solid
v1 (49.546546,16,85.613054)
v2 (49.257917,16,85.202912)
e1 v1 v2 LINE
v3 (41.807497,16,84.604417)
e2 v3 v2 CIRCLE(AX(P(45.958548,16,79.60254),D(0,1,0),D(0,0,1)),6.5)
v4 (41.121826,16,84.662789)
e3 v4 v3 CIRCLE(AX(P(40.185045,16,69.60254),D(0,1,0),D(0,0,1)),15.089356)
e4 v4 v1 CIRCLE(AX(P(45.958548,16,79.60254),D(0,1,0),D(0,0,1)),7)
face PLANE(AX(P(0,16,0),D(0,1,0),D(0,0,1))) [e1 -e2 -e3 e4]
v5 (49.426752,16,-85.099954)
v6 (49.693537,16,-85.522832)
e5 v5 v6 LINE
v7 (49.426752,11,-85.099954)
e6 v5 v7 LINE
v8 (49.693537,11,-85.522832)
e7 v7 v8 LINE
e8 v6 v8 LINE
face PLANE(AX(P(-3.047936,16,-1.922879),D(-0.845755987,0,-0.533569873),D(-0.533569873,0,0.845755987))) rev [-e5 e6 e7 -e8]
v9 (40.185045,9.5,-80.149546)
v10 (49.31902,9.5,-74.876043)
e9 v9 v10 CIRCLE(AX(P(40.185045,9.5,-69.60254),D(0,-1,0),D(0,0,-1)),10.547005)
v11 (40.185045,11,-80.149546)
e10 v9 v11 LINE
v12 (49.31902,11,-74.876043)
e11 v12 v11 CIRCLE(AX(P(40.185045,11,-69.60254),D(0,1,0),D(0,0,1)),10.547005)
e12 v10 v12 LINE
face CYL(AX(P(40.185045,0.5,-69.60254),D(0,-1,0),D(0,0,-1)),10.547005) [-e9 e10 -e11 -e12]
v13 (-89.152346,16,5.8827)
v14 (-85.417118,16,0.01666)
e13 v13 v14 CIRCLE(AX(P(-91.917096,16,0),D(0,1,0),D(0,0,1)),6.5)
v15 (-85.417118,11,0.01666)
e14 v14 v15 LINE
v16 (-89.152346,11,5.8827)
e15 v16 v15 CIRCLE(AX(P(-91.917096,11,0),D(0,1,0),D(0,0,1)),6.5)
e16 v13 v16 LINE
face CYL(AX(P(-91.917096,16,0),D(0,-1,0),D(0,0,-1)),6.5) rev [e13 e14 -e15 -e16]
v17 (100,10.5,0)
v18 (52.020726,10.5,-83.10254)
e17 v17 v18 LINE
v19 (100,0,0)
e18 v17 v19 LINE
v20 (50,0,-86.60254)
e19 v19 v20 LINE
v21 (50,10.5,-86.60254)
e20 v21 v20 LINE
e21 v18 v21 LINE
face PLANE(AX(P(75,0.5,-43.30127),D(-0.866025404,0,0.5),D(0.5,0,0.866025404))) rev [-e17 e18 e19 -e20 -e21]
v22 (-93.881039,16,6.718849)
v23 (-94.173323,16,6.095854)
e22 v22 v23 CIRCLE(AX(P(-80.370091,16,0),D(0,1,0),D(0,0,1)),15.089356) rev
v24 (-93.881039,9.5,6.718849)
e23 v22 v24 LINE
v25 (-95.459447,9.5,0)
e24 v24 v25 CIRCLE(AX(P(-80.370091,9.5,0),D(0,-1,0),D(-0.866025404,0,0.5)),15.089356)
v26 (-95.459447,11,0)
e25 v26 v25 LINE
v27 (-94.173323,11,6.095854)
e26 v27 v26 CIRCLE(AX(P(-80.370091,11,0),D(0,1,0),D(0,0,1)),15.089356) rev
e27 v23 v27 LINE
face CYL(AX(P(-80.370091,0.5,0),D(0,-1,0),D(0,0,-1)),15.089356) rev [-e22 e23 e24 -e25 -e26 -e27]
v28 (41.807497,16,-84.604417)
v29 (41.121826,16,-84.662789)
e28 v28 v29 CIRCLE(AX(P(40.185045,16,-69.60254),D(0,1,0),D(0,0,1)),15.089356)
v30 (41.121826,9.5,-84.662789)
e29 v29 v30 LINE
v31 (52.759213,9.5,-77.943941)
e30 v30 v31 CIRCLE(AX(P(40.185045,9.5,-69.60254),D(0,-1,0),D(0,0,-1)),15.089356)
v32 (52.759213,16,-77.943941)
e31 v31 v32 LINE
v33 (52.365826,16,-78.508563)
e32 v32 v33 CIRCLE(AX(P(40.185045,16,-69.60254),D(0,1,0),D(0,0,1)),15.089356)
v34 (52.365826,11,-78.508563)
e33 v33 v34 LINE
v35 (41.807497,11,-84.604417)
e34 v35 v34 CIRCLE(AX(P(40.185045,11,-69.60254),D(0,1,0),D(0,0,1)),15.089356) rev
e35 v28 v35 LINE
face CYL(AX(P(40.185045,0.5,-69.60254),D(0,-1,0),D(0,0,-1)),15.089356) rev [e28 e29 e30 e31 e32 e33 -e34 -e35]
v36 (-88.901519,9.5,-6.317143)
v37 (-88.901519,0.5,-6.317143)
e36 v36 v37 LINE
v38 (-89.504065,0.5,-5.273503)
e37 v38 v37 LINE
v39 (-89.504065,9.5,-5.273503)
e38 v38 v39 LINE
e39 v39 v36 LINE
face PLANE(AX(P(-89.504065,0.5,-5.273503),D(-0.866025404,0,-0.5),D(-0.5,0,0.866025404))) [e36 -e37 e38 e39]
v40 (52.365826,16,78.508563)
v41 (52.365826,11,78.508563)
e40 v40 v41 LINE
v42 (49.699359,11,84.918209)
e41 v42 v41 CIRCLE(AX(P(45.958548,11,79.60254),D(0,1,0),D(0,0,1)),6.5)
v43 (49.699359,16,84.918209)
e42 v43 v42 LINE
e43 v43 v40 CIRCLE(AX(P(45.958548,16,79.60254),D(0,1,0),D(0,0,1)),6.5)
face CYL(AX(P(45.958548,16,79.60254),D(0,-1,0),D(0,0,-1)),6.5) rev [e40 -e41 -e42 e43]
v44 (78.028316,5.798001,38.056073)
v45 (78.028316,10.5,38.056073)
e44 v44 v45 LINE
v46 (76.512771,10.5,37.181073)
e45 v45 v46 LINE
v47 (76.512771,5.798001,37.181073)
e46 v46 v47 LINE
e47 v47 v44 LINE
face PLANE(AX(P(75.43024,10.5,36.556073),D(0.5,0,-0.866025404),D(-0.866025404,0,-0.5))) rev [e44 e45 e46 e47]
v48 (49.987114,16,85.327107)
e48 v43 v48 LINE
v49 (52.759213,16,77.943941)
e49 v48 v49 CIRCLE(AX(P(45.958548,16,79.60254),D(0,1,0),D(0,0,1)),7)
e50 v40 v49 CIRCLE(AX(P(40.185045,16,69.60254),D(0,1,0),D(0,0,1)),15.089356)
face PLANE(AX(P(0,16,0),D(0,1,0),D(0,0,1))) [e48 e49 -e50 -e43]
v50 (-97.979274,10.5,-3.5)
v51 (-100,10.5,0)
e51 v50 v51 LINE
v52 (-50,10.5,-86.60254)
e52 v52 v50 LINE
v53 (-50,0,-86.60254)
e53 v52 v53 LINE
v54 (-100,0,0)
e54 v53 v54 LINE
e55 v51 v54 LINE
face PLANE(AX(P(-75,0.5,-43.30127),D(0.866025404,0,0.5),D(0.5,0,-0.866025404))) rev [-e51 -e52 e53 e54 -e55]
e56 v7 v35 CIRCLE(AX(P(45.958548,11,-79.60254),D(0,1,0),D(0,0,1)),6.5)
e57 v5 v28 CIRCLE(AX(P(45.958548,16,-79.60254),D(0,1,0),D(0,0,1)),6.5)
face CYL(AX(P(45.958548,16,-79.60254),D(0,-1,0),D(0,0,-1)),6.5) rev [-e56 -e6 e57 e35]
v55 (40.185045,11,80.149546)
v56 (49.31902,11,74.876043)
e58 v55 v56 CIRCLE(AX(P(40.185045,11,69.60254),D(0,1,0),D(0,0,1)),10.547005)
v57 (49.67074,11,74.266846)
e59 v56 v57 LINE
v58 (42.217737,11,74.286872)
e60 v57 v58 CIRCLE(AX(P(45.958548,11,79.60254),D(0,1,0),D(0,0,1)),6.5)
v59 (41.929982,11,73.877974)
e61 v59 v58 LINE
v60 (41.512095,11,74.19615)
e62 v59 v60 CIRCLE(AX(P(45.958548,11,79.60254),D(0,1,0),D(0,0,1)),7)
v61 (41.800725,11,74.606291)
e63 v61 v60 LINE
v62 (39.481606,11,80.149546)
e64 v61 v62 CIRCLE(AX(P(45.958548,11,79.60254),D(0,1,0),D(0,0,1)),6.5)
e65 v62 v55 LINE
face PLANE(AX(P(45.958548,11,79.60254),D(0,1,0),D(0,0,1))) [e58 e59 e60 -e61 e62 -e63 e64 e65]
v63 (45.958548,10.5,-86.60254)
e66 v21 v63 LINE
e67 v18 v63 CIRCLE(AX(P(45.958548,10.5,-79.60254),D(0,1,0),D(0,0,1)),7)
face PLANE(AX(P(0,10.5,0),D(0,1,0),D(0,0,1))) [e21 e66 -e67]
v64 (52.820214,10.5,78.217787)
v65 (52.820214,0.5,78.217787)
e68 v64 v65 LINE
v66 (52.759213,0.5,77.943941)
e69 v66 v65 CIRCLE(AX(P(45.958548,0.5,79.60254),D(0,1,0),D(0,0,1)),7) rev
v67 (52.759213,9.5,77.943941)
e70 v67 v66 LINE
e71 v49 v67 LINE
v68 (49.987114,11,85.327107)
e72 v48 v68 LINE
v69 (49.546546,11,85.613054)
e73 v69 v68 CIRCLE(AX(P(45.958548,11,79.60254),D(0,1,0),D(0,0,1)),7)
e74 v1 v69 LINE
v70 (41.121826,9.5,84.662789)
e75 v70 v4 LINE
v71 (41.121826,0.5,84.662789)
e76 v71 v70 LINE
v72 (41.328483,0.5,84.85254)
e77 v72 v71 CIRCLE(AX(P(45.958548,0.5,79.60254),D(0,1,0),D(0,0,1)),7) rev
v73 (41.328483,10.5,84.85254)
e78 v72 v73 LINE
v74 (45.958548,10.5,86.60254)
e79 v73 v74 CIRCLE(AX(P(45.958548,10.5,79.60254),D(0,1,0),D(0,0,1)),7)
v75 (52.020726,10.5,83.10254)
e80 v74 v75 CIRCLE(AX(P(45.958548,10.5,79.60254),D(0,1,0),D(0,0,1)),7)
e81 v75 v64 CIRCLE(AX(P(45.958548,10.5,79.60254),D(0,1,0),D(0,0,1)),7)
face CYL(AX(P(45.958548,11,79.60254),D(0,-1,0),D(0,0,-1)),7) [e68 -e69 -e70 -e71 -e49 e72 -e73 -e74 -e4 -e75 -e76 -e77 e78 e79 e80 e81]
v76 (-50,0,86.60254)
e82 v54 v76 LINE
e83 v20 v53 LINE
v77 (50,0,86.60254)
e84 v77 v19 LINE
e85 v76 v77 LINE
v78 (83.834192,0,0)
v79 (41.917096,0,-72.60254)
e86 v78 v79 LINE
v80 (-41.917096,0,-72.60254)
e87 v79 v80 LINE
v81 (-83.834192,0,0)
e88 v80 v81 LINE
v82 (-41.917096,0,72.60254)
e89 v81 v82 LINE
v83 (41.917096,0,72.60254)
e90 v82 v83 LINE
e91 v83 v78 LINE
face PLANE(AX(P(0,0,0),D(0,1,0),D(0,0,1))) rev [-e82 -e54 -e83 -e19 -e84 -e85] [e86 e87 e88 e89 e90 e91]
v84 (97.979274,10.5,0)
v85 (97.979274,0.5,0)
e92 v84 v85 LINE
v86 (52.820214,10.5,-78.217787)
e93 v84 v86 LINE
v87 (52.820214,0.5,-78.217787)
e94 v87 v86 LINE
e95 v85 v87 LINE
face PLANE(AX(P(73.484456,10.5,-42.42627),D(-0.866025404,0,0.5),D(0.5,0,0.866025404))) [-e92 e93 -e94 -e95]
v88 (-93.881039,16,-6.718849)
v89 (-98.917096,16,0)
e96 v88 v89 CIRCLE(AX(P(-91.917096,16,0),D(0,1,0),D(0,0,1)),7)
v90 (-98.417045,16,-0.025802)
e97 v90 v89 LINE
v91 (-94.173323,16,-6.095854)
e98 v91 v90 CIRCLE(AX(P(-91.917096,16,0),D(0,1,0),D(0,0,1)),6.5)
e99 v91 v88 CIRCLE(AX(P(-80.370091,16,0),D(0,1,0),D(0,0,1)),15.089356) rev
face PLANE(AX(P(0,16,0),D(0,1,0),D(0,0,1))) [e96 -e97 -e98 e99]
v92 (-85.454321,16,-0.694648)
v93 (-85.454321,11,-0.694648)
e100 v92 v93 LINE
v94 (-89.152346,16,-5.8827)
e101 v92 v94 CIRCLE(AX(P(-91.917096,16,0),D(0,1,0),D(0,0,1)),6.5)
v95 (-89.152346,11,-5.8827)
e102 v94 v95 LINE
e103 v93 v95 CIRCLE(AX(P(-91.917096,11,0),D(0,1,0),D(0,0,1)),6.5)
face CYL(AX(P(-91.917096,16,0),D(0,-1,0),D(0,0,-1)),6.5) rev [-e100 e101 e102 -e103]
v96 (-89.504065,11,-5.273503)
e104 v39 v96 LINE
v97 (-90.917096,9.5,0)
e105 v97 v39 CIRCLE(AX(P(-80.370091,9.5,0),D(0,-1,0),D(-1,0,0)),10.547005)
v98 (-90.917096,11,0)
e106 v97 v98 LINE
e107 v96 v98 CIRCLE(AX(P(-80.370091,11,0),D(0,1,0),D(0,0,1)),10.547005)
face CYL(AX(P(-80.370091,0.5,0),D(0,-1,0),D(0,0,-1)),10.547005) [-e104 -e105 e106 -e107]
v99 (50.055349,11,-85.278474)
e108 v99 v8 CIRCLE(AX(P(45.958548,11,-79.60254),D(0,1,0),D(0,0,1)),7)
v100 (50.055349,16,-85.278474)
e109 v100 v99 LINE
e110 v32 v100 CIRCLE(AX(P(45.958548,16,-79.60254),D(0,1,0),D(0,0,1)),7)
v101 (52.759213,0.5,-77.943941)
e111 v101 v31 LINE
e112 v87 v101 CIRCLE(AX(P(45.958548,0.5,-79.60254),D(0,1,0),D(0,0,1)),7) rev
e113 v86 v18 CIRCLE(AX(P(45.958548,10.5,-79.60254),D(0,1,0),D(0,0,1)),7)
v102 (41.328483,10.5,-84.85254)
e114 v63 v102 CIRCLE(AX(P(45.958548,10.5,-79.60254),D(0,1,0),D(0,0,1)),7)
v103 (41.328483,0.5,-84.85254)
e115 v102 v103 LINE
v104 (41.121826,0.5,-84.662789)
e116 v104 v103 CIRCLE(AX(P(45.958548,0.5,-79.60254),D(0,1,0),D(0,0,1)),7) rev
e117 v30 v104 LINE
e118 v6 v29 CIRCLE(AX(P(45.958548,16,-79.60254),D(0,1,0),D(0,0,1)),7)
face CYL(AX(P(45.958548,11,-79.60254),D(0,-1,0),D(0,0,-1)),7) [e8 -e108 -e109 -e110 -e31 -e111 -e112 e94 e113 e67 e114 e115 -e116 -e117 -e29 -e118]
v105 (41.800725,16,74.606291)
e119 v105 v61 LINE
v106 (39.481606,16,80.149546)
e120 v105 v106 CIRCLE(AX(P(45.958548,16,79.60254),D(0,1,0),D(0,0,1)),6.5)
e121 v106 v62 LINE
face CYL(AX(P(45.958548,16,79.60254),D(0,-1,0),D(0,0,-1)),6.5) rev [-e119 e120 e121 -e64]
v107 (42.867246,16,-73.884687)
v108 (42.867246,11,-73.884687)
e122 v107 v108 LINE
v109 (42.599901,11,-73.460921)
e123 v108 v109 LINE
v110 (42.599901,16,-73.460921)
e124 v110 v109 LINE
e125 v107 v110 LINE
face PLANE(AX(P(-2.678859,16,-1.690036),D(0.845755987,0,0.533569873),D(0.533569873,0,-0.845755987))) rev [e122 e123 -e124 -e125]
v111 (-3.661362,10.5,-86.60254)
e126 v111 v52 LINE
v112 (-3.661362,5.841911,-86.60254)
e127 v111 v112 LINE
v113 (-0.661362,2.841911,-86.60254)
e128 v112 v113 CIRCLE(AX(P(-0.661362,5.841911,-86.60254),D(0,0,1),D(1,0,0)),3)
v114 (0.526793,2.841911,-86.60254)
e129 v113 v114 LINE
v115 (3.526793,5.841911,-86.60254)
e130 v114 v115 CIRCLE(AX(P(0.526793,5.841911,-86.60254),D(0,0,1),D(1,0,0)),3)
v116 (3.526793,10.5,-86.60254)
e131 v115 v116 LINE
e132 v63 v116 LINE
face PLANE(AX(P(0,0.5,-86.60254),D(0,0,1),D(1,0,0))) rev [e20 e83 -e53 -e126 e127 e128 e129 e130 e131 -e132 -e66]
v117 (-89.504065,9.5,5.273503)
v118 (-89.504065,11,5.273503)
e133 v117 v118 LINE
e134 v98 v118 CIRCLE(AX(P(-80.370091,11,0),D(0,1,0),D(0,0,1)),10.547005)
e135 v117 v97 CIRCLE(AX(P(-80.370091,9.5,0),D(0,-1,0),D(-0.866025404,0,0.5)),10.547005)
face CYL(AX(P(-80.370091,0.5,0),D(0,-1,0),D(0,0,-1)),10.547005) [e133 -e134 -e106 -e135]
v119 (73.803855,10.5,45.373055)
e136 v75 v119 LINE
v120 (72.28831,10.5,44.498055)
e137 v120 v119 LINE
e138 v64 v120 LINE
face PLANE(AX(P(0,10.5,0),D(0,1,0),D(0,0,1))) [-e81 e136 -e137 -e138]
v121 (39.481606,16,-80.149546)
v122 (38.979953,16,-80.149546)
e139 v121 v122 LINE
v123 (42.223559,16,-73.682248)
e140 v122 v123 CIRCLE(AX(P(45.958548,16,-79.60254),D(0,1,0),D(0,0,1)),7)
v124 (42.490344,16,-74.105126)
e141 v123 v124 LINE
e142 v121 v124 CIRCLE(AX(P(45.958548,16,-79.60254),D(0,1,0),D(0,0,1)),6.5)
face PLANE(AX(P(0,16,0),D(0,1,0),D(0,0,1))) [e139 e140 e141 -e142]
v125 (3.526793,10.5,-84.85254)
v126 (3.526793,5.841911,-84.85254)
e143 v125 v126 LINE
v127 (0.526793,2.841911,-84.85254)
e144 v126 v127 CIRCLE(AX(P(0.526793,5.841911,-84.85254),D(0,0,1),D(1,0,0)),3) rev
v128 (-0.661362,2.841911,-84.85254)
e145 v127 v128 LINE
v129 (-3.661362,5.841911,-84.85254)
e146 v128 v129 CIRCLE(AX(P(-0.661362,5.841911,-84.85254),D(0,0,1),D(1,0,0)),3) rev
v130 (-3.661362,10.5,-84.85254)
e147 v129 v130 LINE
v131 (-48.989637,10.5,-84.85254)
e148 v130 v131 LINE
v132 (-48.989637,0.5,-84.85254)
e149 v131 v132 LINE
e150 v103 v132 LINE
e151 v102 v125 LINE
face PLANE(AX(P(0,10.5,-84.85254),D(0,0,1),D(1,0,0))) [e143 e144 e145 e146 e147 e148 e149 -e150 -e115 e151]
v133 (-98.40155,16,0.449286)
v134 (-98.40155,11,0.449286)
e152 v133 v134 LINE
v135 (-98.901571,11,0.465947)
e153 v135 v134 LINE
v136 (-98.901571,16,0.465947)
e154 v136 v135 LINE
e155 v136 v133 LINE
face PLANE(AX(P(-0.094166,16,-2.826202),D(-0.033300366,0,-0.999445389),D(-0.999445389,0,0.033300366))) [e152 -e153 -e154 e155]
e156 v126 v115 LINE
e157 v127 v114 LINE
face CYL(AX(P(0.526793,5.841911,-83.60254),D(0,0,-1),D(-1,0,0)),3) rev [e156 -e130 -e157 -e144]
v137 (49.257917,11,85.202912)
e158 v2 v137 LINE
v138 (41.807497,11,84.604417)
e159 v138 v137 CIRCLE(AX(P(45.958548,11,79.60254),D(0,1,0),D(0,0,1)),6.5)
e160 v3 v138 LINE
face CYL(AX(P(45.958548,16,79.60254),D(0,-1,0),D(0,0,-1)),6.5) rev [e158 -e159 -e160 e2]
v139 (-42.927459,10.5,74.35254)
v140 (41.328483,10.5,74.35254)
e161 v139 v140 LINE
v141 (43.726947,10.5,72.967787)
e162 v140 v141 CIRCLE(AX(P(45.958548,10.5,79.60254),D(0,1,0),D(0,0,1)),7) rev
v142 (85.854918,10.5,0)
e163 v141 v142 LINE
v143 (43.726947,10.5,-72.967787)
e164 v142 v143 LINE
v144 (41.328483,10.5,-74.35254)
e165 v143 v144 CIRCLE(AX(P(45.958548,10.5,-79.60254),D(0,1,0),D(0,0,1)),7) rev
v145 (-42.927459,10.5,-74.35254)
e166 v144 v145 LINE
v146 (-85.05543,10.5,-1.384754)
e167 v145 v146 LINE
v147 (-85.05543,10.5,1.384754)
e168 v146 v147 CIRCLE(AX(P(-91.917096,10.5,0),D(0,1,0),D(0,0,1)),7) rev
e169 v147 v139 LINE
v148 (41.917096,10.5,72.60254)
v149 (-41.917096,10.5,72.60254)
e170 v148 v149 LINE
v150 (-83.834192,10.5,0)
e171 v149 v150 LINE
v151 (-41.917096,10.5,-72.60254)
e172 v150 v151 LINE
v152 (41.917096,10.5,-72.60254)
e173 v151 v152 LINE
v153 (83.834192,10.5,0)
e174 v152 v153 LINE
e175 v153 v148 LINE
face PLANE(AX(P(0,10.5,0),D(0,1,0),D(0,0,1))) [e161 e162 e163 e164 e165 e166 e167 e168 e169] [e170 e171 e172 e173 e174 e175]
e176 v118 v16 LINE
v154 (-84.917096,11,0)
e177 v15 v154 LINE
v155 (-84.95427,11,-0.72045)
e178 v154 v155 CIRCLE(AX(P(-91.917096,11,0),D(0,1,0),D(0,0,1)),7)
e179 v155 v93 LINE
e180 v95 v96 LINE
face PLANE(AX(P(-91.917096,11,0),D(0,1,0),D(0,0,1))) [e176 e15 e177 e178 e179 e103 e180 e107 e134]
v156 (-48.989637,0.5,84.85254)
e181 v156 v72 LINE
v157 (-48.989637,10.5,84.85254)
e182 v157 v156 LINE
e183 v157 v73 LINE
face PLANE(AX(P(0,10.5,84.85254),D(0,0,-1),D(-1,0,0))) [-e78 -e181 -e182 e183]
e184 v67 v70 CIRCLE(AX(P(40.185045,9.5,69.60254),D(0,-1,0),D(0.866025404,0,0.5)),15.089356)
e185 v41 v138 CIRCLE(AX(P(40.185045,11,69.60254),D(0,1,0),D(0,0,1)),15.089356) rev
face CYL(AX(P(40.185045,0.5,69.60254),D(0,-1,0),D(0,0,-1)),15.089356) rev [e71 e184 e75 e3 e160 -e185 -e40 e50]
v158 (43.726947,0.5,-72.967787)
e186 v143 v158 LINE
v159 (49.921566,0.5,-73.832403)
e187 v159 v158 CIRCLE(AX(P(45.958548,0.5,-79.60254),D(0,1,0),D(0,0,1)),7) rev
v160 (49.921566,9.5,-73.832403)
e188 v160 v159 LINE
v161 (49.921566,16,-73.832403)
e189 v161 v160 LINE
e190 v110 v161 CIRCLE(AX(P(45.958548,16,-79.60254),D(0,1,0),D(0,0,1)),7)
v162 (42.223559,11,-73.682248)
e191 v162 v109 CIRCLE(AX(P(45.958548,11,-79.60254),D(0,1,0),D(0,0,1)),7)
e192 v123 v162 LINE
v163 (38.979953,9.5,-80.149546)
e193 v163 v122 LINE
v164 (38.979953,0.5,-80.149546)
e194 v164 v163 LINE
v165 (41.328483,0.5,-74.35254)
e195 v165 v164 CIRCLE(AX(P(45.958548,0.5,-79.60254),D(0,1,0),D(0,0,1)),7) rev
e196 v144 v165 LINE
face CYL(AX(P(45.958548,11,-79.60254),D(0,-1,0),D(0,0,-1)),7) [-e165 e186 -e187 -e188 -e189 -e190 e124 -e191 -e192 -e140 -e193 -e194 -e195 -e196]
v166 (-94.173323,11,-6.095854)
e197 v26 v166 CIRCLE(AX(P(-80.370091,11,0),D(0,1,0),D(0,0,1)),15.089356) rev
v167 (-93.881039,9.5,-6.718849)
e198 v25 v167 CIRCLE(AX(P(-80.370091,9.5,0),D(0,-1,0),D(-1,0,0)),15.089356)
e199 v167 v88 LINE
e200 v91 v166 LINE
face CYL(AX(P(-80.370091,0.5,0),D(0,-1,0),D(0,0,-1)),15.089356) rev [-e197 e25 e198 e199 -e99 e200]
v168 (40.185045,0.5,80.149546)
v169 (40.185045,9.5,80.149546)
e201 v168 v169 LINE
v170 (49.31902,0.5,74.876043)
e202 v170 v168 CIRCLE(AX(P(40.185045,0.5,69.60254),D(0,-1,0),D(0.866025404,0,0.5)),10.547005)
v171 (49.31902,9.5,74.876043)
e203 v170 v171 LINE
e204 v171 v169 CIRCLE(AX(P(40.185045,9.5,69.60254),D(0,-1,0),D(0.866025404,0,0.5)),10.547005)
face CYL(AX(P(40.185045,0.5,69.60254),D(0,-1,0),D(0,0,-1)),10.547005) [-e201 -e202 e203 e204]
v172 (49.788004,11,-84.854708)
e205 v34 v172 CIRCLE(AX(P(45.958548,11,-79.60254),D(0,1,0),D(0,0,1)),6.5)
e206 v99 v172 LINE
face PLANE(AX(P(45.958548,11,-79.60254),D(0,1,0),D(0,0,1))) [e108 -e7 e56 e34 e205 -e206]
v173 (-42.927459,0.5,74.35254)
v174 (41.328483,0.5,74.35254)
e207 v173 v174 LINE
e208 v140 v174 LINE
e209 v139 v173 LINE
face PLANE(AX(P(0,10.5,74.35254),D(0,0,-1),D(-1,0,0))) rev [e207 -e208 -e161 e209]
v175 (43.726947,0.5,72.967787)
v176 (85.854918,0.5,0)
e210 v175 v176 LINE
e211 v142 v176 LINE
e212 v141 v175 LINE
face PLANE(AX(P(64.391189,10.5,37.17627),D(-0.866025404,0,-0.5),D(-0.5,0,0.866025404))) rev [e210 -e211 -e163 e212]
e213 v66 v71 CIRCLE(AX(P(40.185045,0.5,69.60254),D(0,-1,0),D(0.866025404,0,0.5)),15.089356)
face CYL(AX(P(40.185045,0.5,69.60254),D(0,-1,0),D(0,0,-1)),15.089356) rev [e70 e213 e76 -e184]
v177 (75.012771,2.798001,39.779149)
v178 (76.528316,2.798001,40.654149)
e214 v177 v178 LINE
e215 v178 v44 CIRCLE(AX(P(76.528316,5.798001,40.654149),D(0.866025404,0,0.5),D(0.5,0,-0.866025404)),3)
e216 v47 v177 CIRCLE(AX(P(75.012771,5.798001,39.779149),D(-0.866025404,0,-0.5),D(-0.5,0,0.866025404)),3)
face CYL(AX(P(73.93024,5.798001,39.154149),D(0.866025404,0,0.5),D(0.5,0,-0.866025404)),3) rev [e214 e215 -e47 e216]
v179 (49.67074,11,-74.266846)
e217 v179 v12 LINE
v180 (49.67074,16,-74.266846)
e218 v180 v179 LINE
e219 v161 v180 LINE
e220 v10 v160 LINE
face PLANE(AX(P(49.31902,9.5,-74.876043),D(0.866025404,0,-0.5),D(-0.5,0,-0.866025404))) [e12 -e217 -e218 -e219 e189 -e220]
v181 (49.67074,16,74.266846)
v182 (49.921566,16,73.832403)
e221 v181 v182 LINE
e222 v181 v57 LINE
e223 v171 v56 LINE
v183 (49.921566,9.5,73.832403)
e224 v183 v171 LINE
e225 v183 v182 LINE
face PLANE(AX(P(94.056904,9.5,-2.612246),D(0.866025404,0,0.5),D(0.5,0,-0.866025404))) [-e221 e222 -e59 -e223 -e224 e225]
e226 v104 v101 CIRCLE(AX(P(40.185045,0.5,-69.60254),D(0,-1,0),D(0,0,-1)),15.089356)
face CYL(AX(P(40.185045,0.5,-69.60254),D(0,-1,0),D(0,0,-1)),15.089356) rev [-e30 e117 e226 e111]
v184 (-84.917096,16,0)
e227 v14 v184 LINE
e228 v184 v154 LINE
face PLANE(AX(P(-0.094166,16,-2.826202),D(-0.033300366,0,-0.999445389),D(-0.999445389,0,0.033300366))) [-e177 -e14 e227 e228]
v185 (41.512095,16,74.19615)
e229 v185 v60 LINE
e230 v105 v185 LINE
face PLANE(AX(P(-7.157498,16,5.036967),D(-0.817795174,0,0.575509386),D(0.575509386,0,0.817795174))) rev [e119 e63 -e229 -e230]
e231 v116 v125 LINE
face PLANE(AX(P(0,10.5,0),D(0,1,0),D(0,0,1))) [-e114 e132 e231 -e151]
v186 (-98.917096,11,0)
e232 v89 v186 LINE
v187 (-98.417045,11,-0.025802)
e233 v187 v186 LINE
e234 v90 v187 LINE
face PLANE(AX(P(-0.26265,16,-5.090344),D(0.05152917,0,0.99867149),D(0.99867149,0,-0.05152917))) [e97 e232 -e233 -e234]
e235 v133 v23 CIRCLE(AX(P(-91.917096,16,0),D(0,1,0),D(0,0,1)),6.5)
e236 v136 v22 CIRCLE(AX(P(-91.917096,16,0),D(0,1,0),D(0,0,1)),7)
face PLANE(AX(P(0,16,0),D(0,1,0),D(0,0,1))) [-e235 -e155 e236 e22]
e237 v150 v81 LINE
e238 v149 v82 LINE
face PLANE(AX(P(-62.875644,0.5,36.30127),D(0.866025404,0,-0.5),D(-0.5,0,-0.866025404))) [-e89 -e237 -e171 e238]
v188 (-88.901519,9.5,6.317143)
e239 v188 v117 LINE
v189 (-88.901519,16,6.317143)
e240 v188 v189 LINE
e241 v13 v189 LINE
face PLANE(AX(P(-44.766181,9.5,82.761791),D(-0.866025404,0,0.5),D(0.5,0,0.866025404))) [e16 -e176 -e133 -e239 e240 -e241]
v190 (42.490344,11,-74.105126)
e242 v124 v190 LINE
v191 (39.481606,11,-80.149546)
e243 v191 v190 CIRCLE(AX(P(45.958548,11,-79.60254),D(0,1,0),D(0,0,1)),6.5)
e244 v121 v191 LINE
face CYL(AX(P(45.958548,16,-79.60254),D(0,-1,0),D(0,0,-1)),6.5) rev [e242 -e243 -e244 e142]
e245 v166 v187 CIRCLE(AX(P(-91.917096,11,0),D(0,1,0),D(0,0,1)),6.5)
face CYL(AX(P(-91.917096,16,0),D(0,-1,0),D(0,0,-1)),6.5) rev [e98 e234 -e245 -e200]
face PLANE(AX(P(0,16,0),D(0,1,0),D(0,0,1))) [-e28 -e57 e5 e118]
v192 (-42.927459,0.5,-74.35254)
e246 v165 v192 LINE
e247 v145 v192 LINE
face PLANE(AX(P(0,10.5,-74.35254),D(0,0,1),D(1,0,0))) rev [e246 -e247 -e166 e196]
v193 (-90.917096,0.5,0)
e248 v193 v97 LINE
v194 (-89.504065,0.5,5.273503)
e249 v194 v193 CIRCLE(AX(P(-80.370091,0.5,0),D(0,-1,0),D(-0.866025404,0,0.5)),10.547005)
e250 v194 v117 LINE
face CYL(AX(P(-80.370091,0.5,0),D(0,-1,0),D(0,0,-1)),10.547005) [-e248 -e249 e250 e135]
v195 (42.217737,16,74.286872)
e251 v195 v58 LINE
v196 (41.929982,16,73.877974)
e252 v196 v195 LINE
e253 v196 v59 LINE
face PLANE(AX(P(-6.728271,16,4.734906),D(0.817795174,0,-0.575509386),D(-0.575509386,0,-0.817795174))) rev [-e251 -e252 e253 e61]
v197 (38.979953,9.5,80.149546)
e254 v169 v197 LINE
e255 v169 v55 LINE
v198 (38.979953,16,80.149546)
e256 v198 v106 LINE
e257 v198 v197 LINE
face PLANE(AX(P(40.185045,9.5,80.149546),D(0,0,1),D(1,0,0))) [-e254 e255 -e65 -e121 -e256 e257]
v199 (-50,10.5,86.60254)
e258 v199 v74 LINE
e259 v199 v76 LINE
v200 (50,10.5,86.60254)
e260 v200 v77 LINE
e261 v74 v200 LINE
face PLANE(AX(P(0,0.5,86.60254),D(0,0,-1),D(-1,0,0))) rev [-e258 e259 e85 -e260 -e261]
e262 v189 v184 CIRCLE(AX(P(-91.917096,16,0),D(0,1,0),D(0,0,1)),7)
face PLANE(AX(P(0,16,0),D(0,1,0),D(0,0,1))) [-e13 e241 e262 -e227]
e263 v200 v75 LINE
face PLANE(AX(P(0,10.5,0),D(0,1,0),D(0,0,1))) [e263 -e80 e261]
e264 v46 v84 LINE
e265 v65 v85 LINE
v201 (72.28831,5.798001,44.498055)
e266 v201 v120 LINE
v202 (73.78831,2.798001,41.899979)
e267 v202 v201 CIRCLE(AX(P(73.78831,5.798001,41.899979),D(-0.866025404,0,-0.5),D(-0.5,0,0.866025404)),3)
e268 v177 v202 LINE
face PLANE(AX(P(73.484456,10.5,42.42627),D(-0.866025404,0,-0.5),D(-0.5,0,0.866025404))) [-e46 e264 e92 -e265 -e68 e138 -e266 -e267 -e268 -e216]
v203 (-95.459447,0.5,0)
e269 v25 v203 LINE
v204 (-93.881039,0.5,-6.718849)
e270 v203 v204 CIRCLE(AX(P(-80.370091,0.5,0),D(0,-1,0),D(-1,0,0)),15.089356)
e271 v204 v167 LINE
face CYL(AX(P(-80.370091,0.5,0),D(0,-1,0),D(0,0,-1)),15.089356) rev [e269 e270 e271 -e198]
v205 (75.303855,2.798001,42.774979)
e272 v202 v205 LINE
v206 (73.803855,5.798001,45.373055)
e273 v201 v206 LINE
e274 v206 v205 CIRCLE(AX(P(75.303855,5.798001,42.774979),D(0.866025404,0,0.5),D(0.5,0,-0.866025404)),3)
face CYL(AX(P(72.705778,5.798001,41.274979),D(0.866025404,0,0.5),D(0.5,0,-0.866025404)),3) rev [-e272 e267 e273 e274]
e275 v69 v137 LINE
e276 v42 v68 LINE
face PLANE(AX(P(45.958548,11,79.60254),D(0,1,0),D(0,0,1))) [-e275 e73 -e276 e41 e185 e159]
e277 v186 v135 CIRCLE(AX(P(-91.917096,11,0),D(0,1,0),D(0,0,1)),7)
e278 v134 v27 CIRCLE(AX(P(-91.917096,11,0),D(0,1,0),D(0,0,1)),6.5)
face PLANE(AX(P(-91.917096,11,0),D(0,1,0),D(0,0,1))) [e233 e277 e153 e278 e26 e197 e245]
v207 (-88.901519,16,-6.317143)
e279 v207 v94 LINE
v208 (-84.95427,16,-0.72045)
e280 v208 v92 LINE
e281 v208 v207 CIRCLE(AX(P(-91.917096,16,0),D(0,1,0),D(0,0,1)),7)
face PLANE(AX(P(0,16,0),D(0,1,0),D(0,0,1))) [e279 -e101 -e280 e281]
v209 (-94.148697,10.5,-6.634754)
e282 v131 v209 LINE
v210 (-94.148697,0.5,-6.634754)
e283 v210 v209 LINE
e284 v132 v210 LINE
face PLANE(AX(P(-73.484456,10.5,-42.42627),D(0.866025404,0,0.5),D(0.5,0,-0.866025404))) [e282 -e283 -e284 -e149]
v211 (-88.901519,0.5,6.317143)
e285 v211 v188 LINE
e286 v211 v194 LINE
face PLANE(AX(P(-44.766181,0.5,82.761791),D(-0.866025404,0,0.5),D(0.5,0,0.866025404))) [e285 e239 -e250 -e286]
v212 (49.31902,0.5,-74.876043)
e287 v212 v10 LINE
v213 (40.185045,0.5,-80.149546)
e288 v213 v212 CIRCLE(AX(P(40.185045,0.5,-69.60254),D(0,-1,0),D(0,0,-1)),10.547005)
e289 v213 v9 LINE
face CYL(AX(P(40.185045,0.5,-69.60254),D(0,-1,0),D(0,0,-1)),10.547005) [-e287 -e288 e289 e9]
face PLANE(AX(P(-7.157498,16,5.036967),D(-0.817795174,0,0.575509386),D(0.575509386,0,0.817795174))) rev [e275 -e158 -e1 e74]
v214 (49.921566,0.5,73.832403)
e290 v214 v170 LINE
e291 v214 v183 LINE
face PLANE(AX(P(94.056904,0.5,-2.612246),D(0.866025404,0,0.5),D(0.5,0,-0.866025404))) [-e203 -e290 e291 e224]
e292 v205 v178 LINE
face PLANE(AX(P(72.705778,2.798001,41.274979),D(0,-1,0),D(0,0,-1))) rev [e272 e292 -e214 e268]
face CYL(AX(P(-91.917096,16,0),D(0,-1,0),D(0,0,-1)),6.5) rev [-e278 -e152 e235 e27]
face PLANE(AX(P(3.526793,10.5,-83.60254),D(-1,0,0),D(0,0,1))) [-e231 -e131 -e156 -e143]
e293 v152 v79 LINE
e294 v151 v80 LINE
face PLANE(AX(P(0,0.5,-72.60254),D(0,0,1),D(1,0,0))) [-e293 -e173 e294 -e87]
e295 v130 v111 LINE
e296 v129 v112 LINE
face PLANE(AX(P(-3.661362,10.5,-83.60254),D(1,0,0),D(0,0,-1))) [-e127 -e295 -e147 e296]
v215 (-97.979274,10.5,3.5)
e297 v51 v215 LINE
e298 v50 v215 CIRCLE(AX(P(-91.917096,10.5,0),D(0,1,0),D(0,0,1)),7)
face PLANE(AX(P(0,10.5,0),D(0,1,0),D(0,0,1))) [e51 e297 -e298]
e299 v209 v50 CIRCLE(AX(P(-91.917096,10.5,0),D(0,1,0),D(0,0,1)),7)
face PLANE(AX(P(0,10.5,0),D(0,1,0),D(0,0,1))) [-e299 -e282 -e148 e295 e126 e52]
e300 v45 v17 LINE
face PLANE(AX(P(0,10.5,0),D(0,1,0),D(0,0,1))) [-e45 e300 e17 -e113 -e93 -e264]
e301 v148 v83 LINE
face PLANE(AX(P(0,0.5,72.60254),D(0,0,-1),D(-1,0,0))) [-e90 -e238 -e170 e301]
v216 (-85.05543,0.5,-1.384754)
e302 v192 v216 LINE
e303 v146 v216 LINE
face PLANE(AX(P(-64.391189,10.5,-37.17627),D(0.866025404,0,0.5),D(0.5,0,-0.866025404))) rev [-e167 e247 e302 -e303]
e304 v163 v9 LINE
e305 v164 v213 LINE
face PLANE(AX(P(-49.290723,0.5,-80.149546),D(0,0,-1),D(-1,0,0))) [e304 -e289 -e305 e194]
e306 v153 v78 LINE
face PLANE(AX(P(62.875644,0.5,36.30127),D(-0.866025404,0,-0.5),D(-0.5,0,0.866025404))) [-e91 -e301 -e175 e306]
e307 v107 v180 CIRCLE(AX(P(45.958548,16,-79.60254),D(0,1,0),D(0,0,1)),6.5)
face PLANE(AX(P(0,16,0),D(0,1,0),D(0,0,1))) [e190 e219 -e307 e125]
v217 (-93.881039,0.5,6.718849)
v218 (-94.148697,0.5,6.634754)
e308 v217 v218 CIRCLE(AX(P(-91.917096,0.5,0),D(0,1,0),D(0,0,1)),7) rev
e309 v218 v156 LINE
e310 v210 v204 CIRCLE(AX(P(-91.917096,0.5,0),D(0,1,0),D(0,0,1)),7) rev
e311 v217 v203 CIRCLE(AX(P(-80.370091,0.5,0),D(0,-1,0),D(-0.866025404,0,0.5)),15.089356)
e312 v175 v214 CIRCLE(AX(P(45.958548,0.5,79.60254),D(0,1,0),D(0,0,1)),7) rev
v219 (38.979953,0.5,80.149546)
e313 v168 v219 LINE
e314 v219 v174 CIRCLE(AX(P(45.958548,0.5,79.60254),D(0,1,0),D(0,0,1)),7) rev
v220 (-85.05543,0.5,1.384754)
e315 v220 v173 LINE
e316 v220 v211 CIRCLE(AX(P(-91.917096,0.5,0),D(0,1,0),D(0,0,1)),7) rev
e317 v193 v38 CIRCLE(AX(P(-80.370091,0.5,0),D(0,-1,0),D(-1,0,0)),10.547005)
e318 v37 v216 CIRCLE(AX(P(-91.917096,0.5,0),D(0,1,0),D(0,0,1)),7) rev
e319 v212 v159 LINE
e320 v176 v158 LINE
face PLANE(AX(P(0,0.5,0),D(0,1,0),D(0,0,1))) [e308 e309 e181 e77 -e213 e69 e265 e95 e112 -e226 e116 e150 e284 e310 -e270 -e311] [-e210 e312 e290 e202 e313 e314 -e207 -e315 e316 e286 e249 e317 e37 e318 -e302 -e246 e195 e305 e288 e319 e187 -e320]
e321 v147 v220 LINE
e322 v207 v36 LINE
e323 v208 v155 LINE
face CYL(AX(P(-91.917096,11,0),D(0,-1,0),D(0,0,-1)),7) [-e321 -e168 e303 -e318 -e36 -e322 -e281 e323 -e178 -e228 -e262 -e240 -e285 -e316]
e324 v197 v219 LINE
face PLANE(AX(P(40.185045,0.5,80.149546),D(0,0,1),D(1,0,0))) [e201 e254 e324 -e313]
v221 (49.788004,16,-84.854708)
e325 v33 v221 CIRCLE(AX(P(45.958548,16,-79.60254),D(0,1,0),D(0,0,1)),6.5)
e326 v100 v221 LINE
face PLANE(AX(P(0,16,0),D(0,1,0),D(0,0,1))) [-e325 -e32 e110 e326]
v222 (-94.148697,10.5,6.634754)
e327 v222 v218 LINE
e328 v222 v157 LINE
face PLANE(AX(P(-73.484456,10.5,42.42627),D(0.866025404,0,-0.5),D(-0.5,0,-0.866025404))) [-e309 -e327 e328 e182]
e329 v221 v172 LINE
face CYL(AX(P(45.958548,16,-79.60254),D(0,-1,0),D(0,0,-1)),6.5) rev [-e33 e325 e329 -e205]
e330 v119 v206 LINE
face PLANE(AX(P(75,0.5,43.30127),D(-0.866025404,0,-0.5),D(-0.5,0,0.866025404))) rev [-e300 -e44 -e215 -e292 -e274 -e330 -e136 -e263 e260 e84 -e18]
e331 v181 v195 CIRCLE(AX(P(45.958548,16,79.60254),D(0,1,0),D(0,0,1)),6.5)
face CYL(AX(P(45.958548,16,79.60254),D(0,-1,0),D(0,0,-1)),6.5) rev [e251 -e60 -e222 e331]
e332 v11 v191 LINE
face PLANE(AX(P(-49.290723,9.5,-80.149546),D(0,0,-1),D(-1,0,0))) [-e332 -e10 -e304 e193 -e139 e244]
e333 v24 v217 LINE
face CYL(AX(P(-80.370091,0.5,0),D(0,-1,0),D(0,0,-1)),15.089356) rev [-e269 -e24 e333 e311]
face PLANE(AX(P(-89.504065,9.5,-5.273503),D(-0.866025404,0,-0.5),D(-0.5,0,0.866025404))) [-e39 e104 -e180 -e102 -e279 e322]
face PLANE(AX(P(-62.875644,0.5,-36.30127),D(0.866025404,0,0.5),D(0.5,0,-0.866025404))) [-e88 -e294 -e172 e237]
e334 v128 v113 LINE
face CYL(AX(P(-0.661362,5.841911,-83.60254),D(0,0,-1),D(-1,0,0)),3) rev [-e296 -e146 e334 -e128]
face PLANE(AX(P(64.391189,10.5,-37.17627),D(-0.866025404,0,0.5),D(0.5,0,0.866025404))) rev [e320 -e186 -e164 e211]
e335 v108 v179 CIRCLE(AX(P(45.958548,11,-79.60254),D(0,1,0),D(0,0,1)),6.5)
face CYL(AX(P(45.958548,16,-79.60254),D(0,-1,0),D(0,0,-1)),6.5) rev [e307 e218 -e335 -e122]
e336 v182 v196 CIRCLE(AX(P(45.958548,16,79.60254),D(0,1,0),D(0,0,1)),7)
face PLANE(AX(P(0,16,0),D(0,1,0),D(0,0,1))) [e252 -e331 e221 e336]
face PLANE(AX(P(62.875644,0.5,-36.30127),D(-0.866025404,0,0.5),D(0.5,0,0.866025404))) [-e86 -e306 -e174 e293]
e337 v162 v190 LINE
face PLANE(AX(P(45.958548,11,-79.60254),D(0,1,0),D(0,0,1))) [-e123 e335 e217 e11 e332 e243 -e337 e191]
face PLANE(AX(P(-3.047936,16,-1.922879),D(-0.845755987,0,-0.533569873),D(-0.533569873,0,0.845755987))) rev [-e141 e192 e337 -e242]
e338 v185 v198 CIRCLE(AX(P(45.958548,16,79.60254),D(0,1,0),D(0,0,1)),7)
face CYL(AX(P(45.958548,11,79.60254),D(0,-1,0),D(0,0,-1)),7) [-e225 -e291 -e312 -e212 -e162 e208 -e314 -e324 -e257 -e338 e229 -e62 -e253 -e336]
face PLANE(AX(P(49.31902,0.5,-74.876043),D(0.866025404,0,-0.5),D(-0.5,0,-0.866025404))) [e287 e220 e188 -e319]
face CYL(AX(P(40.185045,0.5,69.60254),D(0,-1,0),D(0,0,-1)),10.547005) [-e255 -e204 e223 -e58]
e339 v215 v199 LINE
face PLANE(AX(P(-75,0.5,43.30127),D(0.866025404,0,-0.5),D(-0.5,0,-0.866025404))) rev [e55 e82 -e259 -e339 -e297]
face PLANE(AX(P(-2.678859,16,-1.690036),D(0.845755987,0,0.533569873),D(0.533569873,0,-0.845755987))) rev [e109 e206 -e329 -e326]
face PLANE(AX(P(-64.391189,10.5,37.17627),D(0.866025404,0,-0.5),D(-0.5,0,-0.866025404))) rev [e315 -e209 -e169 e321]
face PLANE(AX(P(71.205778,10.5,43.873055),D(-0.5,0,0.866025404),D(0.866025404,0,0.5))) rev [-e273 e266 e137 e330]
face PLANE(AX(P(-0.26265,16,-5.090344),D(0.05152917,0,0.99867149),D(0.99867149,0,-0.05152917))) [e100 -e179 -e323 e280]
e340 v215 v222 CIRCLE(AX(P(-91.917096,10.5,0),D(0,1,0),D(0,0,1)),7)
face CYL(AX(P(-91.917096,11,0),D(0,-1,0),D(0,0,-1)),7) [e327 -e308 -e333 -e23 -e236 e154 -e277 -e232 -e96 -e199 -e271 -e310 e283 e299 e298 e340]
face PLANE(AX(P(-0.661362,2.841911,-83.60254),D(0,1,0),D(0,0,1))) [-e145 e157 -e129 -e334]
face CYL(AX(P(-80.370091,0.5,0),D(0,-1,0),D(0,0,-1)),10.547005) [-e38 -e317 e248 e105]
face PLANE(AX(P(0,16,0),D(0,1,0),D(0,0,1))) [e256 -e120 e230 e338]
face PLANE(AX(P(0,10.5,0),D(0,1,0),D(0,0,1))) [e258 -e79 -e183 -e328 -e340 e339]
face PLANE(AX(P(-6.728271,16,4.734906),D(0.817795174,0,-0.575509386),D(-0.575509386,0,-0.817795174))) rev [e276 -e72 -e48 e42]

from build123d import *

# Parameters (mm, degrees)
SKETCH1_R            = 7
BOSS_EXTRUDE1_DEPTH  = 0.5
SKETCH1_3_R          = 7
BOSS_EXTRUDE2_DEPTH  = 11
BOSS_EXTRUDE9_DEPTH  = 10
CUT_SWEEP1_START     = 0.5
CUT_SWEEP1_DEPTH     = 10.5
BOSS_EXTRUDE10_DEPTH = 5
CUT_EXTRUDE1_DEPTH   = 3
CUT_EXTRUDE2_DEPTH   = 3


# Read off the part's stored shape, not the designer's step: Cut-Sweep1
with BuildPart() as part:
    # Sketch1 → Boss-Extrude1 (new body)
    with BuildSketch(Plane(origin=(0, 0, 0), x_dir=(1, 0, 0), z_dir=(0, 1, 0))):
        with Locations((45.958548116, 79.602540378)):
            Circle(SKETCH1_R)
        with Locations((-91.917096231, 0)):
            Circle(SKETCH1_R)
        Polygon((50, 86.602540378), (-50, 86.602540378), (-100, 0), (-83.834192463, 0), (-41.917096231, 72.602540378), (41.917096231, 72.602540378), align=None)
        with Locations((45.958548116, -79.602540378)):
            Circle(SKETCH1_R)
        with Locations((-91.917096231, 0)):
            Circle(SKETCH1_R)
        Polygon((41.917096231, -72.602540378), (50, -86.602540378), (-50, -86.602540378), (-100, 0), (-83.834192463, 0), (-41.917096231, -72.602540378), align=None)
        with BuildLine():
            ThreePointArc((-97.979274108, -3.499999913), (-90.105362964, -6.761480797), (-84.917096231, 0))
            Line((-84.917096231, 0), (-98.917096231, 0))
            ThreePointArc((-98.917096231, 0), (-98.678577028, -1.811733267), (-97.979274108, -3.499999913))
        make_face()
        with BuildLine():
            Line((-98.917096231, 0), (-84.917096231, 0))
            ThreePointArc((-84.917096231, 0), (-90.105363649, 6.76148098), (-97.979274817, 3.499998686))
            ThreePointArc((-97.979274817, 3.499998686), (-98.678577212, 1.811732583), (-98.917096231, 0))
        make_face()
        with BuildLine():
            ThreePointArc((-97.979274108, -3.499999913), (-90.105362964, -6.761480797), (-84.917096231, 0))
            Line((-84.917096231, 0), (-98.917096231, 0))
            ThreePointArc((-98.917096231, 0), (-98.678577028, -1.811733267), (-97.979274108, -3.499999913))
        make_face()
        with BuildLine():
            Line((-98.917096231, 0), (-84.917096231, 0))
            ThreePointArc((-84.917096231, 0), (-90.105363649, 6.76148098), (-97.979274817, 3.499998686))
            ThreePointArc((-97.979274817, 3.499998686), (-98.678577212, 1.811732583), (-98.917096231, 0))
        make_face()
        with BuildLine():
            ThreePointArc((42.458548116, -73.540362552), (39.197067327, -81.414273677), (45.95854808, -86.602540378))
            ThreePointArc((45.95854808, -86.602540378), (47.770281414, -86.364021167), (49.458548116, -85.664718205))
            Line((49.458548116, -85.664718205), (42.458548116, -73.540362552))
        make_face()
        with BuildLine():
            ThreePointArc((52.958548116, -79.602540378), (49.458548116, -73.540362552), (42.458548116, -73.540362552))
            Line((42.458548116, -73.540362552), (49.458548116, -85.664718205))
            ThreePointArc((49.458548116, -85.664718205), (50.908295282, -84.552288149), (52.020725515, -83.102541119))
            ThreePointArc((52.020725515, -83.102541119), (52.720028789, -81.414274107), (52.958548116, -79.602540378))
        make_face()
        with BuildLine():
            ThreePointArc((42.458548116, -73.540362552), (39.197067327, -81.414273677), (45.95854808, -86.602540378))
            ThreePointArc((45.95854808, -86.602540378), (47.770281414, -86.364021167), (49.458548116, -85.664718205))
            Line((49.458548116, -85.664718205), (42.458548116, -73.540362552))
        make_face()
        with BuildLine():
            ThreePointArc((52.958548116, -79.602540378), (49.458548116, -73.540362552), (42.458548116, -73.540362552))
            Line((42.458548116, -73.540362552), (49.458548116, -85.664718205))
            ThreePointArc((49.458548116, -85.664718205), (50.908295282, -84.552288149), (52.020725515, -83.102541119))
            ThreePointArc((52.020725515, -83.102541119), (52.720028789, -81.414274107), (52.958548116, -79.602540378))
        make_face()
        with BuildLine():
            ThreePointArc((49.458548116, -85.664718205), (47.770281414, -86.364021167), (45.95854808, -86.602540378))
            Line((45.95854808, -86.602540378), (50, -86.602540378))
            Line((50, -86.602540378), (49.458548116, -85.664718205))
        make_face()
        with BuildLine():
            Line((49.458548116, -85.664718205), (50, -86.602540378))
            Line((50, -86.602540378), (52.020725515, -83.102541119))
            ThreePointArc((52.020725515, -83.102541119), (50.908295282, -84.552288149), (49.458548116, -85.664718205))
        make_face()
        with Locations((45.958548116, 79.602540378)):
            Circle(SKETCH1_R)
        with Locations((45.958548116, -79.602540378)):
            Circle(SKETCH1_R)
        Polygon((41.917096231, 72.602540378), (50, 86.602540378), (100, 0), (50, -86.602540378), (41.917096231, -72.602540378), (83.834192463, 0), align=None)
        with BuildLine():
            Line((50, 86.602540378), (45.958548152, 86.602540378))
            ThreePointArc((45.958548152, 86.602540378), (47.770281449, 86.364021158), (49.458548116, 85.664718205))
            Line((49.458548116, 85.664718205), (50, 86.602540378))
        make_face()
        with BuildLine():
            Line((52.020726965, 83.102538606), (50, 86.602540378))
            Line((50, 86.602540378), (49.458548116, 85.664718205))
            ThreePointArc((49.458548116, 85.664718205), (50.908296308, 84.552287123), (52.020726965, 83.102538606))
        make_face()
        with BuildLine():
            ThreePointArc((49.458548116, 85.664718205), (47.770281449, 86.364021158), (45.958548152, 86.602540378))
            ThreePointArc((45.958548152, 86.602540378), (39.197067336, 81.414273712), (42.458548116, 73.540362552))
            Line((42.458548116, 73.540362552), (49.458548116, 85.664718205))
        make_face()
        with BuildLine():
            Line((49.458548116, 85.664718205), (42.458548116, 73.540362552))
            ThreePointArc((42.458548116, 73.540362552), (49.458548116, 73.540362552), (52.958548116, 79.602540378))
            ThreePointArc((52.958548116, 79.602540378), (52.720029165, 81.414272706), (52.020726965, 83.102538606))
            ThreePointArc((52.020726965, 83.102538606), (50.908296308, 84.552287123), (49.458548116, 85.664718205))
        make_face()
        with BuildLine():
            ThreePointArc((49.458548116, 85.664718205), (47.770281449, 86.364021158), (45.958548152, 86.602540378))
            ThreePointArc((45.958548152, 86.602540378), (39.197067336, 81.414273712), (42.458548116, 73.540362552))
            Line((42.458548116, 73.540362552), (49.458548116, 85.664718205))
        make_face()
        with BuildLine():
            Line((49.458548116, 85.664718205), (42.458548116, 73.540362552))
            ThreePointArc((42.458548116, 73.540362552), (49.458548116, 73.540362552), (52.958548116, 79.602540378))
            ThreePointArc((52.958548116, 79.602540378), (52.720029165, 81.414272706), (52.020726965, 83.102538606))
            ThreePointArc((52.020726965, 83.102538606), (50.908296308, 84.552287123), (49.458548116, 85.664718205))
        make_face()
        with BuildLine():
            Line((-100, 0), (-98.917096231, 0))
            ThreePointArc((-98.917096231, 0), (-98.678577212, 1.811732583), (-97.979274817, 3.499998686))
            Line((-97.979274817, 3.499998686), (-100, 0))
        make_face()
        with BuildLine():
            ThreePointArc((-97.979274108, -3.499999913), (-98.678577028, -1.811733267), (-98.917096231, 0))
            Line((-98.917096231, 0), (-100, 0))
            Line((-100, 0), (-97.979274108, -3.499999913))
        make_face()
    extrude(amount=BOSS_EXTRUDE1_DEPTH)

    # Sketch1<3> → Boss-Extrude2 (add)
    with BuildSketch(Plane(origin=(0, 0, 0), x_dir=(1, 0, 0), z_dir=(0, 1, 0))):
        with Locations(Location((-91.917096231, 0, 0), (0, 0, 150))):
            Circle(SKETCH1_3_R)
        with Locations(Location((45.958548116, -79.602540378, 0), (0, 0, 270))):
            Circle(SKETCH1_3_R)
        with Locations(Location((45.958548116, 79.602540378, 0), (0, 0, 90))):
            Circle(SKETCH1_3_R)
    extrude(amount=BOSS_EXTRUDE2_DEPTH)

    # Sketch2 → Boss-Extrude9 (add)
    # profile 1 of 7: a face of its own
    with BuildSketch(Plane(origin=(0, 0.5, 0), x_dir=(1, 0, 0), z_dir=(0, 1, 0))):
        with BuildLine():
            Line((85.854918405, 0), (43.726947143, 72.967786645))
            ThreePointArc((43.726947143, 72.967786645), (43.078483321, 73.222475584), (42.458548116, 73.540362552))
            ThreePointArc((42.458548116, 73.540362552), (41.873282323, 73.918298705), (41.328483321, 74.352540378))
            Line((41.328483321, 74.352540378), (-42.927459202, 74.352540378))
            Line((-42.927459202, 74.352540378), (-85.055430464, 1.384753733))
            ThreePointArc((-85.055430464, 1.384753733), (-84.917096231, 0), (-85.055430464, -1.384753733))
            Line((-85.055430464, -1.384753733), (-42.927459202, -74.352540378))
            Line((-42.927459202, -74.352540378), (41.328483321, -74.352540378))
            ThreePointArc((41.328483321, -74.352540378), (41.873282323, -73.918298705), (42.458548116, -73.540362552))
            ThreePointArc((42.458548116, -73.540362552), (43.078483321, -73.222475584), (43.726947143, -72.967786645))
            Line((43.726947143, -72.967786645), (85.854918405, 0))
        make_face()
        Polygon((-83.834192463, 0), (-41.917096231, 72.602540378), (41.917096231, 72.602540378), (83.834192463, 0), (41.917096231, -72.602540378), (-41.917096231, -72.602540378), align=None, mode=Mode.SUBTRACT)
    # profile 2 of 7: a face of its own
    with BuildSketch(Plane(origin=(0, 0.5, 0), x_dir=(1, 0, 0), z_dir=(0, 1, 0))):
        with BuildLine():
            ThreePointArc((41.328483321, 84.852540378), (43.483674382, 86.150440805), (45.958548116, 86.602540378))
            Line((45.958548116, 86.602540378), (-50, 86.602540378))
            Line((-50, 86.602540378), (-97.979274058, 3.5))
            ThreePointArc((-97.979274058, 3.5), (-96.350307475, 5.417253738), (-94.148697204, 6.634753733))
            Line((-94.148697204, 6.634753733), (-48.989637029, 84.852540378))
            Line((-48.989637029, 84.852540378), (41.328483321, 84.852540378))
        make_face()
    # profile 3 of 7: a face of its own
    with BuildSketch(Plane(origin=(0, 0.5, 0), x_dir=(1, 0, 0), z_dir=(0, 1, 0))):
        with BuildLine():
            ThreePointArc((-94.148697204, 6.634753733), (-96.350307475, 5.417253738), (-97.979274058, 3.5))
            Line((-97.979274058, 3.5), (-100, 0))
            Line((-100, 0), (-97.979274058, -3.5))
            ThreePointArc((-97.979274058, -3.5), (-96.350307475, -5.417253738), (-94.148697204, -6.634753733))
            Line((-94.148697204, -6.634753733), (-97.979274058, 0))
            Line((-97.979274058, 0), (-94.148697204, 6.634753733))
        make_face()
    # profile 4 of 7: a face of its own
    with BuildSketch(Plane(origin=(0, 0.5, 0), x_dir=(1, 0, 0), z_dir=(0, 1, 0))):
        with BuildLine():
            Line((-50, -86.602540378), (45.958548116, -86.602540378))
            ThreePointArc((45.958548116, -86.602540378), (43.483674382, -86.150440805), (41.328483321, -84.852540378))
            Line((41.328483321, -84.852540378), (-48.989637029, -84.852540378))
            Line((-48.989637029, -84.852540378), (-94.148697204, -6.634753733))
            ThreePointArc((-94.148697204, -6.634753733), (-96.350307475, -5.417253738), (-97.979274058, -3.5))
            Line((-97.979274058, -3.5), (-50, -86.602540378))
        make_face()
    # profile 5 of 7: a face of its own
    with BuildSketch(Plane(origin=(0, 0.5, 0), x_dir=(1, 0, 0), z_dir=(0, 1, 0))):
        with BuildLine():
            Line((50, -86.602540378), (52.020725942, -83.102540378))
            ThreePointArc((52.020725942, -83.102540378), (52.866633094, -80.733187067), (52.820213883, -78.217786645))
            Line((52.820213883, -78.217786645), (48.989637029, -84.852540378))
            Line((48.989637029, -84.852540378), (41.328483321, -84.852540378))
            ThreePointArc((41.328483321, -84.852540378), (43.483674382, -86.150440805), (45.958548116, -86.602540378))
            Line((45.958548116, -86.602540378), (50, -86.602540378))
        make_face()
    # profile 6 of 7: a face of its own
    with BuildSketch(Plane(origin=(0, 0.5, 0), x_dir=(1, 0, 0), z_dir=(0, 1, 0))):
        with BuildLine():
            Line((52.020725942, -83.102540378), (100, 0))
            Line((100, 0), (52.020725942, 83.102540378))
            ThreePointArc((52.020725942, 83.102540378), (52.866633094, 80.733187067), (52.820213883, 78.217786645))
            Line((52.820213883, 78.217786645), (97.979274058, 0))
            Line((97.979274058, 0), (52.820213883, -78.217786645))
            ThreePointArc((52.820213883, -78.217786645), (52.866633094, -80.733187067), (52.020725942, -83.102540378))
        make_face()
    # profile 7 of 7: a face of its own
    with BuildSketch(Plane(origin=(0, 0.5, 0), x_dir=(1, 0, 0), z_dir=(0, 1, 0))):
        with BuildLine():
            ThreePointArc((52.820213883, 78.217786645), (52.866633094, 80.733187067), (52.020725942, 83.102540378))
            Line((52.020725942, 83.102540378), (50, 86.602540378))
            Line((50, 86.602540378), (45.958548116, 86.602540378))
            ThreePointArc((45.958548116, 86.602540378), (43.483674382, 86.150440805), (41.328483321, 84.852540378))
            Line((41.328483321, 84.852540378), (48.989637029, 84.852540378))
            Line((48.989637029, 84.852540378), (52.820213883, 78.217786645))
        make_face()
    extrude(amount=BOSS_EXTRUDE9_DEPTH)

    # Cut-Sweep1 outline → Cut-Sweep1 (cut)
    with BuildSketch(Plane(origin=(0, 0, 0), x_dir=(1, 0, 0), z_dir=(0, 1, 0)).offset(CUT_SWEEP1_START)):
        with BuildLine():
            Line((38.979953336, 80.149545762), (40.185045424, 80.149545762))
            ThreePointArc((40.185045424, 80.149545762), (45.458548116, 78.736514975), (49.31902002, 74.87604307))
            Line((49.31902002, 74.87604307), (49.921566065, 73.832402707))
            ThreePointArc((49.921566065, 73.832402707), (51.719659537, 75.626412211), (52.759213307, 77.943940678))
            ThreePointArc((52.759213307, 77.943940678), (47.729723298, 82.670305783), (41.121826045, 84.662789346))
            ThreePointArc((41.121826045, 84.662789346), (39.634564405, 82.603745139), (38.979953336, 80.149545762))
        make_face()
        with BuildLine():
            Line((49.921566065, -73.832402707), (49.31902002, -74.87604307))
            ThreePointArc((49.31902002, -74.87604307), (45.458548116, -78.736514975), (40.185045424, -80.149545762))
            Line((40.185045424, -80.149545762), (38.979953336, -80.149545762))
            ThreePointArc((38.979953336, -80.149545762), (39.634564405, -82.603745139), (41.121826046, -84.662789345))
            ThreePointArc((41.121826046, -84.662789345), (47.729723298, -82.670305783), (52.759213306, -77.943940678))
            ThreePointArc((52.759213306, -77.943940678), (51.719659537, -75.626412211), (49.921566065, -73.832402707))
        make_face()
        with BuildLine():
            Line((-88.901519399, -6.317143055), (-89.504065444, -5.273502692))
            ThreePointArc((-89.504065444, -5.273502692), (-90.557715738, -2.729765862), (-90.917096231, 0))
            ThreePointArc((-90.917096231, 0), (-90.557715738, 2.729765862), (-89.504065444, 5.273502692))
            Line((-89.504065444, 5.273502692), (-88.901519399, 6.317143055))
            ThreePointArc((-88.901519399, 6.317143055), (-91.35422394, 6.977332928), (-93.881039351, 6.718848668))
            ThreePointArc((-93.881039351, 6.718848668), (-95.05954566, 3.450880209), (-95.459446596, 0))
            ThreePointArc((-95.459446596, 0), (-95.05954566, -3.450880209), (-93.881039351, -6.718848668))
            ThreePointArc((-93.881039351, -6.718848668), (-91.35422394, -6.977332928), (-88.901519399, -6.317143055))
        make_face()
    extrude(amount=CUT_SWEEP1_DEPTH, mode=Mode.SUBTRACT)

    # Sketch5 → Boss-Extrude10 (add)
    with BuildSketch(Plane(origin=(0, 11, 0), x_dir=(1, 0, 0), z_dir=(0, 1, 0))):
        with BuildLine():
            ThreePointArc((41.121826045, -84.662789346), (45.173960153, -86.558431531), (49.546546407, -85.613053523))
            Line((49.546546407, -85.613053523), (49.257916635, -85.202912453))
            ThreePointArc((49.257916635, -85.202912453), (45.438077094, -86.081669171), (41.807496677, -84.604417222))
            ThreePointArc((41.807496677, -84.604417222), (41.464994162, -84.637512547), (41.121826045, -84.662789346))
        make_face()
        with BuildLine():
            ThreePointArc((52.365826248, -78.508562802), (52.565738898, -78.228494586), (52.759213306, -77.943940678))
            ThreePointArc((52.759213306, -77.943940678), (52.511856072, -82.063059598), (49.987113815, -85.327106598))
            Line((49.987113815, -85.327106598), (49.699359122, -84.918209011))
            ThreePointArc((49.699359122, -84.918209011), (51.959949571, -82.099174228), (52.365826248, -78.508562802))
        make_face()
        with BuildLine():
            ThreePointArc((49.921566064, -73.832402708), (45.918631751, -72.602654188), (41.929982416, -73.877974159))
            Line((41.929982416, -73.877974159), (42.217737109, -74.286871746))
            ThreePointArc((42.217737109, -74.286871746), (45.94108332, -73.102563841), (49.670739961, -74.266846262))
            Line((49.670739961, -74.266846262), (49.921566064, -73.832402708))
        make_face()
        with BuildLine():
            Line((41.800725218, -74.60629091), (41.512095446, -74.19614984))
            ThreePointArc((41.512095446, -74.19614984), (39.516991001, -76.862769962), (38.979953335, -80.149545762))
            Line((38.979953335, -80.149545762), (39.481605541, -80.149545762))
            ThreePointArc((39.481605541, -80.149545762), (39.962176067, -77.093851029), (41.800725218, -74.60629091))
        make_face()
        with BuildLine():
            Line((42.867245524, 73.88468691), (42.599900531, 73.460921178))
            ThreePointArc((42.599900531, 73.460921178), (46.313252945, 72.611532977), (49.921566064, 73.832402708))
            Line((49.921566064, 73.832402708), (49.670739961, 74.266846262))
            ThreePointArc((49.670739961, 74.266846262), (46.323085232, 73.11277053), (42.867245524, 73.88468691))
        make_face()
        with BuildLine():
            Line((39.481605541, 80.149545762), (38.979953335, 80.149545762))
            ThreePointArc((38.979953335, 80.149545762), (39.701415902, 76.464340821), (42.223559002, 73.682248466))
            Line((42.223559002, 73.682248466), (42.490343939, 74.10512646))
            ThreePointArc((42.490343939, 74.10512646), (40.139593128, 76.706031644), (39.481605541, 80.149545762))
        make_face()
        with BuildLine():
            ThreePointArc((52.759213306, 77.943940678), (52.526465324, 82.023792854), (50.055348986, 85.278474013))
            Line((50.055348986, 85.278474013), (49.788003994, 84.854708281))
            ThreePointArc((49.788003994, 84.854708281), (51.980679915, 82.048747359), (52.365826248, 78.508562802))
            ThreePointArc((52.365826248, 78.508562802), (52.565738898, 78.228494586), (52.759213306, 77.943940678))
        make_face()
        with BuildLine():
            ThreePointArc((41.807496677, 84.604417222), (41.464994162, 84.637512547), (41.121826045, 84.662789346))
            ThreePointArc((41.121826045, 84.662789346), (45.259711694, 86.567569284), (49.693537229, 85.52283229))
            Line((49.693537229, 85.52283229), (49.426752292, 85.099954297))
            ThreePointArc((49.426752292, 85.099954297), (45.536695838, 86.088836753), (41.807496677, 84.604417222))
        make_face()
        with BuildLine():
            Line((-98.401550079, -0.449286427), (-98.90157143, -0.465946561))
            ThreePointArc((-98.90157143, -0.465946561), (-97.375415001, -4.382551335), (-93.881039351, -6.718848668))
            ThreePointArc((-93.881039351, -6.718848668), (-94.03073306, -6.409017961), (-94.173322925, -6.09585442))
            ThreePointArc((-94.173322925, -6.09585442), (-97.120057562, -3.896048433), (-98.401550079, -0.449286427))
        make_face()
        with BuildLine():
            Line((-89.152345503, -5.8826995), (-88.901519399, -6.317143055))
            ThreePointArc((-88.901519399, -6.317143055), (-85.996410552, -3.734364884), (-84.917096231, 0))
            Line((-84.917096231, 0), (-85.417117582, -0.016660134))
            ThreePointArc((-85.417117582, -0.016660134), (-86.434267849, -3.49121654), (-89.152345503, -5.8826995))
        make_face()
        with BuildLine():
            Line((-84.954269807, 0.720449987), (-85.454321016, 0.694648485))
            ThreePointArc((-85.454321016, 0.694648485), (-86.624103024, 3.772826912), (-89.152345503, 5.8826995))
            Line((-89.152345503, 5.8826995), (-88.901519399, 6.317143055))
            ThreePointArc((-88.901519399, 6.317143055), (-86.196704968, 4.034491764), (-84.954269807, 0.720449987))
        make_face()
        with BuildLine():
            ThreePointArc((-93.881039351, 6.718848668), (-97.518328321, 4.198356712), (-98.917096231, 0))
            Line((-98.917096231, 0), (-98.417045022, 0.025801502))
            ThreePointArc((-98.417045022, 0.025801502), (-97.244294171, 3.724374057), (-94.173322925, 6.09585442))
            ThreePointArc((-94.173322925, 6.09585442), (-94.03073306, 6.409017961), (-93.881039351, 6.718848668))
        make_face()
    extrude(amount=BOSS_EXTRUDE10_DEPTH)

    # Sketch6 → Cut-Extrude1 (cut)
    with BuildSketch(Plane(origin=(75, 0, 43.301270189), x_dir=(0.49999999999999406, 0, -0.8660254037844421), z_dir=(0.866025403784442, 0, 0.499999999999994))):
        with BuildLine():
            Line((-2.392290784, 10.5), (6.056631877, 10.5))
            Line((6.056631877, 10.5), (6.056631877, 5.798001155))
            ThreePointArc((6.056631877, 5.798001155), (5.17795222, 3.676680811), (3.056631877, 2.798001155))
            Line((3.056631877, 2.798001155), (0.607709216, 2.798001155))
            ThreePointArc((0.607709216, 2.798001155), (-1.513611128, 3.676680811), (-2.392290784, 5.798001155))
            Line((-2.392290784, 5.798001155), (-2.392290784, 10.5))
        make_face()
    extrude(amount=-CUT_EXTRUDE1_DEPTH, mode=Mode.SUBTRACT)

    # Sketch7 → Cut-Extrude2 (cut)
    with BuildSketch(Plane.XY.offset(-86.602540378)):
        with BuildLine():
            Line((-3.661362227, 10.5), (3.52679283, 10.5))
            Line((3.52679283, 10.5), (3.52679283, 5.841911445))
            ThreePointArc((3.52679283, 5.841911445), (2.648113174, 3.720591102), (0.52679283, 2.841911445))
            Line((0.52679283, 2.841911445), (-0.661362227, 2.841911445))
            ThreePointArc((-0.661362227, 2.841911445), (-2.782682571, 3.720591102), (-3.661362227, 5.841911445))
            Line((-3.661362227, 5.841911445), (-3.661362227, 10.5))
        make_face()
    extrude(amount=CUT_EXTRUDE2_DEPTH, mode=Mode.SUBTRACT)


solid = part.part
